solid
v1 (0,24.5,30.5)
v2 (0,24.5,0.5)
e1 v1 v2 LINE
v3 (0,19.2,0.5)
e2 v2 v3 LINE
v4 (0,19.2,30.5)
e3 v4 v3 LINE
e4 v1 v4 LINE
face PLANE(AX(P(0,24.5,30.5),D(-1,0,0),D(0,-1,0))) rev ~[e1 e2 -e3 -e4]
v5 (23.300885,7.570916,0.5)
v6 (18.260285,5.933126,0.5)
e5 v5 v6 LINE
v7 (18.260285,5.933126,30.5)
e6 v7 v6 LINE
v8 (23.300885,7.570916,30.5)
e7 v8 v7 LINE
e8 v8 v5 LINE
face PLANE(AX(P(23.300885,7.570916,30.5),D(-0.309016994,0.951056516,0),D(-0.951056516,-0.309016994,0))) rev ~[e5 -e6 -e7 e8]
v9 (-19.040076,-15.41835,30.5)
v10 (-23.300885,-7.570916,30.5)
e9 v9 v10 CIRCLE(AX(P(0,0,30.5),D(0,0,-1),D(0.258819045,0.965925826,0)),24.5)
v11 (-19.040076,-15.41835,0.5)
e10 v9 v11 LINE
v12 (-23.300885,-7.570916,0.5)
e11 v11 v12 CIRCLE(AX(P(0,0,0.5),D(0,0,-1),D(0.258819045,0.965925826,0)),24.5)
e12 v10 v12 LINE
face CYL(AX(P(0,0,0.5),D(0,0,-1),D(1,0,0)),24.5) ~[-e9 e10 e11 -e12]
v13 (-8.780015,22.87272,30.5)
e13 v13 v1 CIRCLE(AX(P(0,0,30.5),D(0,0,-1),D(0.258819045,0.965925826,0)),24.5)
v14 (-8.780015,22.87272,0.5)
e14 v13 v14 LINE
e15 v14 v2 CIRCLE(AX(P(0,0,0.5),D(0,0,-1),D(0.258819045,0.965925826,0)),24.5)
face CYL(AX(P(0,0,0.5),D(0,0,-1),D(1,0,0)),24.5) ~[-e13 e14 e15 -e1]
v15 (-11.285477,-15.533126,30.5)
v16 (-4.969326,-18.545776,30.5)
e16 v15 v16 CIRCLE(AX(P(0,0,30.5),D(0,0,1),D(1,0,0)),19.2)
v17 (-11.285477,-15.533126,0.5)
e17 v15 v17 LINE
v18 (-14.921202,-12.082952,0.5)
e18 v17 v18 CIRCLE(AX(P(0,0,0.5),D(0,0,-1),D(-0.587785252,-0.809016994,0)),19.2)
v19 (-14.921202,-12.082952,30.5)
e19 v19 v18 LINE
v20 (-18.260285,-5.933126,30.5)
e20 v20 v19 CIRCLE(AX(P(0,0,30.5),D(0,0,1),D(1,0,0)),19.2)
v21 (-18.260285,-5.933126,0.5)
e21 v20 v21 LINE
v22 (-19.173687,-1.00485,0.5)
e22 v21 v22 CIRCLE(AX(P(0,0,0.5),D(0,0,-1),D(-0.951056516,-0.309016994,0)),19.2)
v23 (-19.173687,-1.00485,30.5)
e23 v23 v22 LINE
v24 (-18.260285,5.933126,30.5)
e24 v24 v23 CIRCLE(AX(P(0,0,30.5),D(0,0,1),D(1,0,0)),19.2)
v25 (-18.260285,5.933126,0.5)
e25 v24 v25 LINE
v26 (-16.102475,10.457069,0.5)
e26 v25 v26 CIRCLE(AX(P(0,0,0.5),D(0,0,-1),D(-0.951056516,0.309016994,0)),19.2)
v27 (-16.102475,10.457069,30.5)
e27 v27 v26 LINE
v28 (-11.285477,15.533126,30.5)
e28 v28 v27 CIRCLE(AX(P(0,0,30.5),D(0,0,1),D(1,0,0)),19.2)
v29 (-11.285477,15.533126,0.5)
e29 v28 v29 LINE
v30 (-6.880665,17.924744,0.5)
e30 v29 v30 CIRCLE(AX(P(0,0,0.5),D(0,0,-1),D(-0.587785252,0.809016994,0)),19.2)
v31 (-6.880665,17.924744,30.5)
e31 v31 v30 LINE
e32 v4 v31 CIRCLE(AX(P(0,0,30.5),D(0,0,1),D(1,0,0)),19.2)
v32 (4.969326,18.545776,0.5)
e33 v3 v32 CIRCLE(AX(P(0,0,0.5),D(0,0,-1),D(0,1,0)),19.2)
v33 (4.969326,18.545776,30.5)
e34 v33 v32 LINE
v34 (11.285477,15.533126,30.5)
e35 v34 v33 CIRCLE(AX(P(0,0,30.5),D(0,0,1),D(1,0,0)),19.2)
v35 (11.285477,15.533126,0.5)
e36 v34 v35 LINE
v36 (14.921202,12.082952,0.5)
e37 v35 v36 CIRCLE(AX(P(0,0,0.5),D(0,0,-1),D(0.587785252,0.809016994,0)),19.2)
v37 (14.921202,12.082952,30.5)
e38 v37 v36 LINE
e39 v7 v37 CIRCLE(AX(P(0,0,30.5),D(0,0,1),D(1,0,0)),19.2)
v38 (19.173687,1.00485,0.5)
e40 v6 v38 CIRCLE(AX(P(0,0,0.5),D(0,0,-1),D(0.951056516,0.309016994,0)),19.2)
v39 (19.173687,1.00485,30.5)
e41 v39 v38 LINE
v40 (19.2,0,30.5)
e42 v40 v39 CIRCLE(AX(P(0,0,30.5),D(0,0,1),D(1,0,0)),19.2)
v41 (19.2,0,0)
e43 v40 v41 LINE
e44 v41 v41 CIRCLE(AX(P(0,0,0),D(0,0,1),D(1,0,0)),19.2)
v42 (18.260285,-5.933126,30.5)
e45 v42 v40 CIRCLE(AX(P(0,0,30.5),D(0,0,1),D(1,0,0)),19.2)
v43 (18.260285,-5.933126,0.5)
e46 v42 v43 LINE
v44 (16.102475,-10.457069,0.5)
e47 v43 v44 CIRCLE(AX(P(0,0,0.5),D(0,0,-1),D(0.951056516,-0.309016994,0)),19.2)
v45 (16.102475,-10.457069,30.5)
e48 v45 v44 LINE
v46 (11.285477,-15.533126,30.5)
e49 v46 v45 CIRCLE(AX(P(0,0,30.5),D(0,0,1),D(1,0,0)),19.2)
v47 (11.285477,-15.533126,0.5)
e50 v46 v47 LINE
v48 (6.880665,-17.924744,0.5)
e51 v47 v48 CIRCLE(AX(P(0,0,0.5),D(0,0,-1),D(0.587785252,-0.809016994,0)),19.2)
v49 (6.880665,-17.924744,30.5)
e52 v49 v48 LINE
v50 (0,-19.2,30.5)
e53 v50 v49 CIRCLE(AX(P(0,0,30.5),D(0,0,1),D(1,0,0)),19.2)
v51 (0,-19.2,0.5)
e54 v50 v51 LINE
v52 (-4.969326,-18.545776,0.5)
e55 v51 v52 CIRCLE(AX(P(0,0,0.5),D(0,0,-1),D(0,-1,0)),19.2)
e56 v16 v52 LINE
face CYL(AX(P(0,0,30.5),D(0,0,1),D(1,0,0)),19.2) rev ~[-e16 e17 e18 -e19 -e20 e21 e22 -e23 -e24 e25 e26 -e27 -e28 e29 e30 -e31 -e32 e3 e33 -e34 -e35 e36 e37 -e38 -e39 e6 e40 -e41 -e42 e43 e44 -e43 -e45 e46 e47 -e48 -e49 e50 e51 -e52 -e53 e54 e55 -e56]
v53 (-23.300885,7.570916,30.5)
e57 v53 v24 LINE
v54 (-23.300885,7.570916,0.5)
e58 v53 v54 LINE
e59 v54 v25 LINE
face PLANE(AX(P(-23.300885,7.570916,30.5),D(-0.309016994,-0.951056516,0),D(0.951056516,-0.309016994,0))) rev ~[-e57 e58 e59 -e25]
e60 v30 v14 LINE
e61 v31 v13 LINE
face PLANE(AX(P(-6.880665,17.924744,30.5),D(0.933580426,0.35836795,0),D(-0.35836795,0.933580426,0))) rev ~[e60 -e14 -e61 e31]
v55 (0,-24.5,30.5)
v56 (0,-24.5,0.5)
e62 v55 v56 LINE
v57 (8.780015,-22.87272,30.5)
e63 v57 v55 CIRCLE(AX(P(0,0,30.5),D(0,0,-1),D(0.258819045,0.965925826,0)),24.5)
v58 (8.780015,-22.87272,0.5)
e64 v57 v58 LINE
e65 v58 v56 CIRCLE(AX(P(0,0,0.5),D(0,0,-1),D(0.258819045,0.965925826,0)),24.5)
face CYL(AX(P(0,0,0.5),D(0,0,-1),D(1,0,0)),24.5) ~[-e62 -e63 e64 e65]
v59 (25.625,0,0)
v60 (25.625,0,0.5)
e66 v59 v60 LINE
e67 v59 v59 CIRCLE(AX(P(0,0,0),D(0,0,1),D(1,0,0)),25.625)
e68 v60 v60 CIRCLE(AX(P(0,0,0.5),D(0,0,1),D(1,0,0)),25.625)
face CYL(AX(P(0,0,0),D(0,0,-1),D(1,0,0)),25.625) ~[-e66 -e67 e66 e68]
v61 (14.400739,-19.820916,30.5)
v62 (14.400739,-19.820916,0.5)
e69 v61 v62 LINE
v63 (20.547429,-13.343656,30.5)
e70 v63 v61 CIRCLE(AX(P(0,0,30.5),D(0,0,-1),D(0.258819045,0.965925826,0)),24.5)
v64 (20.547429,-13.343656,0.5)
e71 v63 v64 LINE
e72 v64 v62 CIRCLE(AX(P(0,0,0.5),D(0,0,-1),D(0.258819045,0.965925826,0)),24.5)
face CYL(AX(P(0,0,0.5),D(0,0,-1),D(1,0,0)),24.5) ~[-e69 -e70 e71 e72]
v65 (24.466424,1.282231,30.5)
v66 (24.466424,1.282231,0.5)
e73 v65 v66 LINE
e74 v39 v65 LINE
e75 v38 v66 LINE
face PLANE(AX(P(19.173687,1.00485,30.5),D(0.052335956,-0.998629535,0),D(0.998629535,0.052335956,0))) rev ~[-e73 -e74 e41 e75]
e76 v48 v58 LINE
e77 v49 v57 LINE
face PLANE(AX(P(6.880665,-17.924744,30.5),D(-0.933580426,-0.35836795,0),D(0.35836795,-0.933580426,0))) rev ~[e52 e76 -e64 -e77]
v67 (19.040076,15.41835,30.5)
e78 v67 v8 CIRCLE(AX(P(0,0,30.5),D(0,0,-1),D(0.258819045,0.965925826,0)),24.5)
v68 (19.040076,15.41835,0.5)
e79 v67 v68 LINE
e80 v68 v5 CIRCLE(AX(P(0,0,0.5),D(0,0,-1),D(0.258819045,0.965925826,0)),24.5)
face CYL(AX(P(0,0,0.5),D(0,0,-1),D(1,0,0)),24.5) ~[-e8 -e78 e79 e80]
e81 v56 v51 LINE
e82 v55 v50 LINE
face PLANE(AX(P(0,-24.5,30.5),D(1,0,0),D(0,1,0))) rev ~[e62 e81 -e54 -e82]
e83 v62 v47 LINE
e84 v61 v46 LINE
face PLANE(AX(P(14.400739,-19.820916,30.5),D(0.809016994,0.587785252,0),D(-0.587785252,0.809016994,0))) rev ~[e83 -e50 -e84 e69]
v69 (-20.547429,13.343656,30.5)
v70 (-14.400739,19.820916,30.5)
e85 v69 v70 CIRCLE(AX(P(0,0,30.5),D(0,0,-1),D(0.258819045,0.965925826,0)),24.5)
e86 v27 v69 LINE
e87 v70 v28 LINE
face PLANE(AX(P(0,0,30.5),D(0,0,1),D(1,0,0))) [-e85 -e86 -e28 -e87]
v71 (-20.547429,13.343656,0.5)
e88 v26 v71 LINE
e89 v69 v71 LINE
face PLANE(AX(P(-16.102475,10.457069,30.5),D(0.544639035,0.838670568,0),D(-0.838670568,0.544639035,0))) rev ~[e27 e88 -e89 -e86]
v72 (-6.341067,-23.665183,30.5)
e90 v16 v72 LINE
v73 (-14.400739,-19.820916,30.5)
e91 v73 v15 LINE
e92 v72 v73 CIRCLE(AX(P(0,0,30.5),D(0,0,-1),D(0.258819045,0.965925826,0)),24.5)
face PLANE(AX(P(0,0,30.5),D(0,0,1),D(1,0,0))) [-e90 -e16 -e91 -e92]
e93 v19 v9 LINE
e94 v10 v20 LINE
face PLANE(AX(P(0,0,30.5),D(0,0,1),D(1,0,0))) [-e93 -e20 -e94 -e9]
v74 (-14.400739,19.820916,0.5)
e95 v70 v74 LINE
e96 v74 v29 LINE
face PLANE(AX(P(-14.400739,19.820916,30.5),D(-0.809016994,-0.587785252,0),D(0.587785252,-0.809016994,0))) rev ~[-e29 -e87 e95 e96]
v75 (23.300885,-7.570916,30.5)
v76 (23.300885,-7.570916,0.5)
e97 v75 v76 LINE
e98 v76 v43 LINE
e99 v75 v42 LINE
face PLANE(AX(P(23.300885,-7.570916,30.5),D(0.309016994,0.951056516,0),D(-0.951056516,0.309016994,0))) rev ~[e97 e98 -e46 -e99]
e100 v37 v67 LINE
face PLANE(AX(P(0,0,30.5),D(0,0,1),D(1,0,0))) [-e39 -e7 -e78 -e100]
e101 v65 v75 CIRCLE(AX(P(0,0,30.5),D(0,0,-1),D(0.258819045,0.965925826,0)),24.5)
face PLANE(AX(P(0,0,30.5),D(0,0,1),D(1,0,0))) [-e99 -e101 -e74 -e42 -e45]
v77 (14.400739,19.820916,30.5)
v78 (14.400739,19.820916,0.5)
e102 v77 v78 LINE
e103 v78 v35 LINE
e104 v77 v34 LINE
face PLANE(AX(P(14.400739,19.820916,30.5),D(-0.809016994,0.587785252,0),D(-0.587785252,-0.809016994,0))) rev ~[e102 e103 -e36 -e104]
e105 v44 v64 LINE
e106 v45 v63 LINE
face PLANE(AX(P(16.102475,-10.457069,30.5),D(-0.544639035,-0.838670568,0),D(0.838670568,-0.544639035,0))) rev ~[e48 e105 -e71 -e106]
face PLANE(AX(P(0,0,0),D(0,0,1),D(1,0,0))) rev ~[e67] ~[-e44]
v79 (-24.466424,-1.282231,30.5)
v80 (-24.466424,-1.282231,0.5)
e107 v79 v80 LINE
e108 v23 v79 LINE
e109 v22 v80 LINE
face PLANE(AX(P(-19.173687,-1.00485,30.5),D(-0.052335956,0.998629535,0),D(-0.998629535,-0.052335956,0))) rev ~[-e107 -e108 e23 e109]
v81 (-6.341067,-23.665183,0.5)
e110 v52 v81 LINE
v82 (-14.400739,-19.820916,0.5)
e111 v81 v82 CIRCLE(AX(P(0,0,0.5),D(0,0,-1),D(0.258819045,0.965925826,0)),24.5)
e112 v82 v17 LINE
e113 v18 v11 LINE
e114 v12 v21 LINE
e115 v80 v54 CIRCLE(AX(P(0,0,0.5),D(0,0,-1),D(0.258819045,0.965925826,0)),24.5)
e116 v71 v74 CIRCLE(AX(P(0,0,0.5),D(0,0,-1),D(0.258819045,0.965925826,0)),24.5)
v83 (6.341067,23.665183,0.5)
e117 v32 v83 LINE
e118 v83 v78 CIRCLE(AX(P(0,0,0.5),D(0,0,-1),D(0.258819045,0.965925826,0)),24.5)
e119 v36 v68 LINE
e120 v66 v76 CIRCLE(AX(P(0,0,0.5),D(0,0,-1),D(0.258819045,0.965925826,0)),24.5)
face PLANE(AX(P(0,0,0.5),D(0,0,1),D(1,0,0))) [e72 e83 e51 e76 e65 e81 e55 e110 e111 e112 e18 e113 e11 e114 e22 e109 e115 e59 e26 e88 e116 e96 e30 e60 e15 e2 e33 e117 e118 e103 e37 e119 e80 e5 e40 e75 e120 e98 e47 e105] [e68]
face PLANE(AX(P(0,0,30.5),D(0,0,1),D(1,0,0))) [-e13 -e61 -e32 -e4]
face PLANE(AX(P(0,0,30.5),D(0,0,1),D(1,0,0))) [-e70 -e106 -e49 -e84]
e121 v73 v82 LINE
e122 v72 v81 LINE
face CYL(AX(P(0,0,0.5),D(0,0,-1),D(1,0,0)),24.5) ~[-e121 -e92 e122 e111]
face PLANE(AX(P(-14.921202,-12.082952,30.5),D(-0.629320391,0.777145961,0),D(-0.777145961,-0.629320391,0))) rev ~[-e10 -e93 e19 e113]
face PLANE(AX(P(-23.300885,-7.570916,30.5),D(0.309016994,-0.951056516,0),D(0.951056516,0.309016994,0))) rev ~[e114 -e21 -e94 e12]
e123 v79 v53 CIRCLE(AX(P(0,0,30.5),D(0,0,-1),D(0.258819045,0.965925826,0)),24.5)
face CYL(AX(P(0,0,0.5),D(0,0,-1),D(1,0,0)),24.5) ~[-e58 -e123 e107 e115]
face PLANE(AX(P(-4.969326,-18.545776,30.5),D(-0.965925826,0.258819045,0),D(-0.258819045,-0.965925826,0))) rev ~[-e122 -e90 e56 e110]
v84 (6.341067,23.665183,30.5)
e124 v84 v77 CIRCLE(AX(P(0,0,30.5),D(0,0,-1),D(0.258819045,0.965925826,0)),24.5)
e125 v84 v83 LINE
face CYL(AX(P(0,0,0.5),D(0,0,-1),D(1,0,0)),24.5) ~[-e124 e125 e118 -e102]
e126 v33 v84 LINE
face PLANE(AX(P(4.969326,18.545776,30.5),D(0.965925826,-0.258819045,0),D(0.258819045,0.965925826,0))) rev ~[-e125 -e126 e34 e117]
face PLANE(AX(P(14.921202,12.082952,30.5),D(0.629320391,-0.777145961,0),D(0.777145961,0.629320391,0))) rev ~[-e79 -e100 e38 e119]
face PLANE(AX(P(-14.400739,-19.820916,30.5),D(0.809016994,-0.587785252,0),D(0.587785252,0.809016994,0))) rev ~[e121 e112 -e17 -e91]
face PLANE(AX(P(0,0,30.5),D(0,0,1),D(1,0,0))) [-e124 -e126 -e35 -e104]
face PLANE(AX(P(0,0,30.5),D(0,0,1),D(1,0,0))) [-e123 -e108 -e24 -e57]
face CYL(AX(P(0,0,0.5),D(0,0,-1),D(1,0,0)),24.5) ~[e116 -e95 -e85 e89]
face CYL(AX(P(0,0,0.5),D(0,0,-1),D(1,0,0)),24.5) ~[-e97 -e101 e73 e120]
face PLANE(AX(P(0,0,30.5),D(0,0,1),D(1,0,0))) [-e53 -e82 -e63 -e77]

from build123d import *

# Parameters (mm, degrees)
F0_R            = 25.625
F1_DEPTH        = 0.5
F2_R            = 24.5
F3_DEPTH        = 30
F4_R            = 19.2
F5_DEPTH        = 30.501
F7_DEPTH        = 30
F7_COPIES_COUNT = 10


# Not quite as in the source:
# - a pattern or mirror of a feature is missing from the dataset's text; its kind, count and spacing are read off the source's solid


with BuildPart() as f1:
    # F0 (on Top) → F1 (new body)
    with BuildSketch(Plane.XY):
        Circle(F0_R)
    extrude(amount=F1_DEPTH)

    # F2 (on face) → F3 (join)
    with BuildSketch(Plane.XY.offset(0.5)):
        Circle(F2_R)
    extrude(amount=F3_DEPTH)

    # F4 (on face) → F5 (cut, through all)
    with BuildSketch(Plane.XY.offset(30.5)):
        Circle(F4_R)
    extrude(amount=-F5_DEPTH, mode=Mode.SUBTRACT)

    # F6 (on face) → F7 (cut, through all)
    with BuildSketch(Plane.XY.offset(30.5)):
        with BuildLine():
            Line((4.969325666, 18.5457758648), (6.341066605, 23.6651827441))
            ThreePointArc((6.341066605, 23.6651827441), (3.1978917094, 24.2903991037), (0, 24.5))
            Line((0, 24.5), (0, 19.2))
            ThreePointArc((0, 19.2), (2.5061028906, 19.0357413384), (4.969325666, 18.5457758648))
        make_face()
    f7 = extrude(amount=-F7_DEPTH, mode=Mode.SUBTRACT)

    # F7_copies: F7 ×10 about axis
    f7_copies_axis = Axis((0, 0, 0), (0, 0, 1))
    for i in range(1, F7_COPIES_COUNT):
        add(f7.rotate(f7_copies_axis, i * 360 / F7_COPIES_COUNT), mode=Mode.SUBTRACT)


solid = f1.part
